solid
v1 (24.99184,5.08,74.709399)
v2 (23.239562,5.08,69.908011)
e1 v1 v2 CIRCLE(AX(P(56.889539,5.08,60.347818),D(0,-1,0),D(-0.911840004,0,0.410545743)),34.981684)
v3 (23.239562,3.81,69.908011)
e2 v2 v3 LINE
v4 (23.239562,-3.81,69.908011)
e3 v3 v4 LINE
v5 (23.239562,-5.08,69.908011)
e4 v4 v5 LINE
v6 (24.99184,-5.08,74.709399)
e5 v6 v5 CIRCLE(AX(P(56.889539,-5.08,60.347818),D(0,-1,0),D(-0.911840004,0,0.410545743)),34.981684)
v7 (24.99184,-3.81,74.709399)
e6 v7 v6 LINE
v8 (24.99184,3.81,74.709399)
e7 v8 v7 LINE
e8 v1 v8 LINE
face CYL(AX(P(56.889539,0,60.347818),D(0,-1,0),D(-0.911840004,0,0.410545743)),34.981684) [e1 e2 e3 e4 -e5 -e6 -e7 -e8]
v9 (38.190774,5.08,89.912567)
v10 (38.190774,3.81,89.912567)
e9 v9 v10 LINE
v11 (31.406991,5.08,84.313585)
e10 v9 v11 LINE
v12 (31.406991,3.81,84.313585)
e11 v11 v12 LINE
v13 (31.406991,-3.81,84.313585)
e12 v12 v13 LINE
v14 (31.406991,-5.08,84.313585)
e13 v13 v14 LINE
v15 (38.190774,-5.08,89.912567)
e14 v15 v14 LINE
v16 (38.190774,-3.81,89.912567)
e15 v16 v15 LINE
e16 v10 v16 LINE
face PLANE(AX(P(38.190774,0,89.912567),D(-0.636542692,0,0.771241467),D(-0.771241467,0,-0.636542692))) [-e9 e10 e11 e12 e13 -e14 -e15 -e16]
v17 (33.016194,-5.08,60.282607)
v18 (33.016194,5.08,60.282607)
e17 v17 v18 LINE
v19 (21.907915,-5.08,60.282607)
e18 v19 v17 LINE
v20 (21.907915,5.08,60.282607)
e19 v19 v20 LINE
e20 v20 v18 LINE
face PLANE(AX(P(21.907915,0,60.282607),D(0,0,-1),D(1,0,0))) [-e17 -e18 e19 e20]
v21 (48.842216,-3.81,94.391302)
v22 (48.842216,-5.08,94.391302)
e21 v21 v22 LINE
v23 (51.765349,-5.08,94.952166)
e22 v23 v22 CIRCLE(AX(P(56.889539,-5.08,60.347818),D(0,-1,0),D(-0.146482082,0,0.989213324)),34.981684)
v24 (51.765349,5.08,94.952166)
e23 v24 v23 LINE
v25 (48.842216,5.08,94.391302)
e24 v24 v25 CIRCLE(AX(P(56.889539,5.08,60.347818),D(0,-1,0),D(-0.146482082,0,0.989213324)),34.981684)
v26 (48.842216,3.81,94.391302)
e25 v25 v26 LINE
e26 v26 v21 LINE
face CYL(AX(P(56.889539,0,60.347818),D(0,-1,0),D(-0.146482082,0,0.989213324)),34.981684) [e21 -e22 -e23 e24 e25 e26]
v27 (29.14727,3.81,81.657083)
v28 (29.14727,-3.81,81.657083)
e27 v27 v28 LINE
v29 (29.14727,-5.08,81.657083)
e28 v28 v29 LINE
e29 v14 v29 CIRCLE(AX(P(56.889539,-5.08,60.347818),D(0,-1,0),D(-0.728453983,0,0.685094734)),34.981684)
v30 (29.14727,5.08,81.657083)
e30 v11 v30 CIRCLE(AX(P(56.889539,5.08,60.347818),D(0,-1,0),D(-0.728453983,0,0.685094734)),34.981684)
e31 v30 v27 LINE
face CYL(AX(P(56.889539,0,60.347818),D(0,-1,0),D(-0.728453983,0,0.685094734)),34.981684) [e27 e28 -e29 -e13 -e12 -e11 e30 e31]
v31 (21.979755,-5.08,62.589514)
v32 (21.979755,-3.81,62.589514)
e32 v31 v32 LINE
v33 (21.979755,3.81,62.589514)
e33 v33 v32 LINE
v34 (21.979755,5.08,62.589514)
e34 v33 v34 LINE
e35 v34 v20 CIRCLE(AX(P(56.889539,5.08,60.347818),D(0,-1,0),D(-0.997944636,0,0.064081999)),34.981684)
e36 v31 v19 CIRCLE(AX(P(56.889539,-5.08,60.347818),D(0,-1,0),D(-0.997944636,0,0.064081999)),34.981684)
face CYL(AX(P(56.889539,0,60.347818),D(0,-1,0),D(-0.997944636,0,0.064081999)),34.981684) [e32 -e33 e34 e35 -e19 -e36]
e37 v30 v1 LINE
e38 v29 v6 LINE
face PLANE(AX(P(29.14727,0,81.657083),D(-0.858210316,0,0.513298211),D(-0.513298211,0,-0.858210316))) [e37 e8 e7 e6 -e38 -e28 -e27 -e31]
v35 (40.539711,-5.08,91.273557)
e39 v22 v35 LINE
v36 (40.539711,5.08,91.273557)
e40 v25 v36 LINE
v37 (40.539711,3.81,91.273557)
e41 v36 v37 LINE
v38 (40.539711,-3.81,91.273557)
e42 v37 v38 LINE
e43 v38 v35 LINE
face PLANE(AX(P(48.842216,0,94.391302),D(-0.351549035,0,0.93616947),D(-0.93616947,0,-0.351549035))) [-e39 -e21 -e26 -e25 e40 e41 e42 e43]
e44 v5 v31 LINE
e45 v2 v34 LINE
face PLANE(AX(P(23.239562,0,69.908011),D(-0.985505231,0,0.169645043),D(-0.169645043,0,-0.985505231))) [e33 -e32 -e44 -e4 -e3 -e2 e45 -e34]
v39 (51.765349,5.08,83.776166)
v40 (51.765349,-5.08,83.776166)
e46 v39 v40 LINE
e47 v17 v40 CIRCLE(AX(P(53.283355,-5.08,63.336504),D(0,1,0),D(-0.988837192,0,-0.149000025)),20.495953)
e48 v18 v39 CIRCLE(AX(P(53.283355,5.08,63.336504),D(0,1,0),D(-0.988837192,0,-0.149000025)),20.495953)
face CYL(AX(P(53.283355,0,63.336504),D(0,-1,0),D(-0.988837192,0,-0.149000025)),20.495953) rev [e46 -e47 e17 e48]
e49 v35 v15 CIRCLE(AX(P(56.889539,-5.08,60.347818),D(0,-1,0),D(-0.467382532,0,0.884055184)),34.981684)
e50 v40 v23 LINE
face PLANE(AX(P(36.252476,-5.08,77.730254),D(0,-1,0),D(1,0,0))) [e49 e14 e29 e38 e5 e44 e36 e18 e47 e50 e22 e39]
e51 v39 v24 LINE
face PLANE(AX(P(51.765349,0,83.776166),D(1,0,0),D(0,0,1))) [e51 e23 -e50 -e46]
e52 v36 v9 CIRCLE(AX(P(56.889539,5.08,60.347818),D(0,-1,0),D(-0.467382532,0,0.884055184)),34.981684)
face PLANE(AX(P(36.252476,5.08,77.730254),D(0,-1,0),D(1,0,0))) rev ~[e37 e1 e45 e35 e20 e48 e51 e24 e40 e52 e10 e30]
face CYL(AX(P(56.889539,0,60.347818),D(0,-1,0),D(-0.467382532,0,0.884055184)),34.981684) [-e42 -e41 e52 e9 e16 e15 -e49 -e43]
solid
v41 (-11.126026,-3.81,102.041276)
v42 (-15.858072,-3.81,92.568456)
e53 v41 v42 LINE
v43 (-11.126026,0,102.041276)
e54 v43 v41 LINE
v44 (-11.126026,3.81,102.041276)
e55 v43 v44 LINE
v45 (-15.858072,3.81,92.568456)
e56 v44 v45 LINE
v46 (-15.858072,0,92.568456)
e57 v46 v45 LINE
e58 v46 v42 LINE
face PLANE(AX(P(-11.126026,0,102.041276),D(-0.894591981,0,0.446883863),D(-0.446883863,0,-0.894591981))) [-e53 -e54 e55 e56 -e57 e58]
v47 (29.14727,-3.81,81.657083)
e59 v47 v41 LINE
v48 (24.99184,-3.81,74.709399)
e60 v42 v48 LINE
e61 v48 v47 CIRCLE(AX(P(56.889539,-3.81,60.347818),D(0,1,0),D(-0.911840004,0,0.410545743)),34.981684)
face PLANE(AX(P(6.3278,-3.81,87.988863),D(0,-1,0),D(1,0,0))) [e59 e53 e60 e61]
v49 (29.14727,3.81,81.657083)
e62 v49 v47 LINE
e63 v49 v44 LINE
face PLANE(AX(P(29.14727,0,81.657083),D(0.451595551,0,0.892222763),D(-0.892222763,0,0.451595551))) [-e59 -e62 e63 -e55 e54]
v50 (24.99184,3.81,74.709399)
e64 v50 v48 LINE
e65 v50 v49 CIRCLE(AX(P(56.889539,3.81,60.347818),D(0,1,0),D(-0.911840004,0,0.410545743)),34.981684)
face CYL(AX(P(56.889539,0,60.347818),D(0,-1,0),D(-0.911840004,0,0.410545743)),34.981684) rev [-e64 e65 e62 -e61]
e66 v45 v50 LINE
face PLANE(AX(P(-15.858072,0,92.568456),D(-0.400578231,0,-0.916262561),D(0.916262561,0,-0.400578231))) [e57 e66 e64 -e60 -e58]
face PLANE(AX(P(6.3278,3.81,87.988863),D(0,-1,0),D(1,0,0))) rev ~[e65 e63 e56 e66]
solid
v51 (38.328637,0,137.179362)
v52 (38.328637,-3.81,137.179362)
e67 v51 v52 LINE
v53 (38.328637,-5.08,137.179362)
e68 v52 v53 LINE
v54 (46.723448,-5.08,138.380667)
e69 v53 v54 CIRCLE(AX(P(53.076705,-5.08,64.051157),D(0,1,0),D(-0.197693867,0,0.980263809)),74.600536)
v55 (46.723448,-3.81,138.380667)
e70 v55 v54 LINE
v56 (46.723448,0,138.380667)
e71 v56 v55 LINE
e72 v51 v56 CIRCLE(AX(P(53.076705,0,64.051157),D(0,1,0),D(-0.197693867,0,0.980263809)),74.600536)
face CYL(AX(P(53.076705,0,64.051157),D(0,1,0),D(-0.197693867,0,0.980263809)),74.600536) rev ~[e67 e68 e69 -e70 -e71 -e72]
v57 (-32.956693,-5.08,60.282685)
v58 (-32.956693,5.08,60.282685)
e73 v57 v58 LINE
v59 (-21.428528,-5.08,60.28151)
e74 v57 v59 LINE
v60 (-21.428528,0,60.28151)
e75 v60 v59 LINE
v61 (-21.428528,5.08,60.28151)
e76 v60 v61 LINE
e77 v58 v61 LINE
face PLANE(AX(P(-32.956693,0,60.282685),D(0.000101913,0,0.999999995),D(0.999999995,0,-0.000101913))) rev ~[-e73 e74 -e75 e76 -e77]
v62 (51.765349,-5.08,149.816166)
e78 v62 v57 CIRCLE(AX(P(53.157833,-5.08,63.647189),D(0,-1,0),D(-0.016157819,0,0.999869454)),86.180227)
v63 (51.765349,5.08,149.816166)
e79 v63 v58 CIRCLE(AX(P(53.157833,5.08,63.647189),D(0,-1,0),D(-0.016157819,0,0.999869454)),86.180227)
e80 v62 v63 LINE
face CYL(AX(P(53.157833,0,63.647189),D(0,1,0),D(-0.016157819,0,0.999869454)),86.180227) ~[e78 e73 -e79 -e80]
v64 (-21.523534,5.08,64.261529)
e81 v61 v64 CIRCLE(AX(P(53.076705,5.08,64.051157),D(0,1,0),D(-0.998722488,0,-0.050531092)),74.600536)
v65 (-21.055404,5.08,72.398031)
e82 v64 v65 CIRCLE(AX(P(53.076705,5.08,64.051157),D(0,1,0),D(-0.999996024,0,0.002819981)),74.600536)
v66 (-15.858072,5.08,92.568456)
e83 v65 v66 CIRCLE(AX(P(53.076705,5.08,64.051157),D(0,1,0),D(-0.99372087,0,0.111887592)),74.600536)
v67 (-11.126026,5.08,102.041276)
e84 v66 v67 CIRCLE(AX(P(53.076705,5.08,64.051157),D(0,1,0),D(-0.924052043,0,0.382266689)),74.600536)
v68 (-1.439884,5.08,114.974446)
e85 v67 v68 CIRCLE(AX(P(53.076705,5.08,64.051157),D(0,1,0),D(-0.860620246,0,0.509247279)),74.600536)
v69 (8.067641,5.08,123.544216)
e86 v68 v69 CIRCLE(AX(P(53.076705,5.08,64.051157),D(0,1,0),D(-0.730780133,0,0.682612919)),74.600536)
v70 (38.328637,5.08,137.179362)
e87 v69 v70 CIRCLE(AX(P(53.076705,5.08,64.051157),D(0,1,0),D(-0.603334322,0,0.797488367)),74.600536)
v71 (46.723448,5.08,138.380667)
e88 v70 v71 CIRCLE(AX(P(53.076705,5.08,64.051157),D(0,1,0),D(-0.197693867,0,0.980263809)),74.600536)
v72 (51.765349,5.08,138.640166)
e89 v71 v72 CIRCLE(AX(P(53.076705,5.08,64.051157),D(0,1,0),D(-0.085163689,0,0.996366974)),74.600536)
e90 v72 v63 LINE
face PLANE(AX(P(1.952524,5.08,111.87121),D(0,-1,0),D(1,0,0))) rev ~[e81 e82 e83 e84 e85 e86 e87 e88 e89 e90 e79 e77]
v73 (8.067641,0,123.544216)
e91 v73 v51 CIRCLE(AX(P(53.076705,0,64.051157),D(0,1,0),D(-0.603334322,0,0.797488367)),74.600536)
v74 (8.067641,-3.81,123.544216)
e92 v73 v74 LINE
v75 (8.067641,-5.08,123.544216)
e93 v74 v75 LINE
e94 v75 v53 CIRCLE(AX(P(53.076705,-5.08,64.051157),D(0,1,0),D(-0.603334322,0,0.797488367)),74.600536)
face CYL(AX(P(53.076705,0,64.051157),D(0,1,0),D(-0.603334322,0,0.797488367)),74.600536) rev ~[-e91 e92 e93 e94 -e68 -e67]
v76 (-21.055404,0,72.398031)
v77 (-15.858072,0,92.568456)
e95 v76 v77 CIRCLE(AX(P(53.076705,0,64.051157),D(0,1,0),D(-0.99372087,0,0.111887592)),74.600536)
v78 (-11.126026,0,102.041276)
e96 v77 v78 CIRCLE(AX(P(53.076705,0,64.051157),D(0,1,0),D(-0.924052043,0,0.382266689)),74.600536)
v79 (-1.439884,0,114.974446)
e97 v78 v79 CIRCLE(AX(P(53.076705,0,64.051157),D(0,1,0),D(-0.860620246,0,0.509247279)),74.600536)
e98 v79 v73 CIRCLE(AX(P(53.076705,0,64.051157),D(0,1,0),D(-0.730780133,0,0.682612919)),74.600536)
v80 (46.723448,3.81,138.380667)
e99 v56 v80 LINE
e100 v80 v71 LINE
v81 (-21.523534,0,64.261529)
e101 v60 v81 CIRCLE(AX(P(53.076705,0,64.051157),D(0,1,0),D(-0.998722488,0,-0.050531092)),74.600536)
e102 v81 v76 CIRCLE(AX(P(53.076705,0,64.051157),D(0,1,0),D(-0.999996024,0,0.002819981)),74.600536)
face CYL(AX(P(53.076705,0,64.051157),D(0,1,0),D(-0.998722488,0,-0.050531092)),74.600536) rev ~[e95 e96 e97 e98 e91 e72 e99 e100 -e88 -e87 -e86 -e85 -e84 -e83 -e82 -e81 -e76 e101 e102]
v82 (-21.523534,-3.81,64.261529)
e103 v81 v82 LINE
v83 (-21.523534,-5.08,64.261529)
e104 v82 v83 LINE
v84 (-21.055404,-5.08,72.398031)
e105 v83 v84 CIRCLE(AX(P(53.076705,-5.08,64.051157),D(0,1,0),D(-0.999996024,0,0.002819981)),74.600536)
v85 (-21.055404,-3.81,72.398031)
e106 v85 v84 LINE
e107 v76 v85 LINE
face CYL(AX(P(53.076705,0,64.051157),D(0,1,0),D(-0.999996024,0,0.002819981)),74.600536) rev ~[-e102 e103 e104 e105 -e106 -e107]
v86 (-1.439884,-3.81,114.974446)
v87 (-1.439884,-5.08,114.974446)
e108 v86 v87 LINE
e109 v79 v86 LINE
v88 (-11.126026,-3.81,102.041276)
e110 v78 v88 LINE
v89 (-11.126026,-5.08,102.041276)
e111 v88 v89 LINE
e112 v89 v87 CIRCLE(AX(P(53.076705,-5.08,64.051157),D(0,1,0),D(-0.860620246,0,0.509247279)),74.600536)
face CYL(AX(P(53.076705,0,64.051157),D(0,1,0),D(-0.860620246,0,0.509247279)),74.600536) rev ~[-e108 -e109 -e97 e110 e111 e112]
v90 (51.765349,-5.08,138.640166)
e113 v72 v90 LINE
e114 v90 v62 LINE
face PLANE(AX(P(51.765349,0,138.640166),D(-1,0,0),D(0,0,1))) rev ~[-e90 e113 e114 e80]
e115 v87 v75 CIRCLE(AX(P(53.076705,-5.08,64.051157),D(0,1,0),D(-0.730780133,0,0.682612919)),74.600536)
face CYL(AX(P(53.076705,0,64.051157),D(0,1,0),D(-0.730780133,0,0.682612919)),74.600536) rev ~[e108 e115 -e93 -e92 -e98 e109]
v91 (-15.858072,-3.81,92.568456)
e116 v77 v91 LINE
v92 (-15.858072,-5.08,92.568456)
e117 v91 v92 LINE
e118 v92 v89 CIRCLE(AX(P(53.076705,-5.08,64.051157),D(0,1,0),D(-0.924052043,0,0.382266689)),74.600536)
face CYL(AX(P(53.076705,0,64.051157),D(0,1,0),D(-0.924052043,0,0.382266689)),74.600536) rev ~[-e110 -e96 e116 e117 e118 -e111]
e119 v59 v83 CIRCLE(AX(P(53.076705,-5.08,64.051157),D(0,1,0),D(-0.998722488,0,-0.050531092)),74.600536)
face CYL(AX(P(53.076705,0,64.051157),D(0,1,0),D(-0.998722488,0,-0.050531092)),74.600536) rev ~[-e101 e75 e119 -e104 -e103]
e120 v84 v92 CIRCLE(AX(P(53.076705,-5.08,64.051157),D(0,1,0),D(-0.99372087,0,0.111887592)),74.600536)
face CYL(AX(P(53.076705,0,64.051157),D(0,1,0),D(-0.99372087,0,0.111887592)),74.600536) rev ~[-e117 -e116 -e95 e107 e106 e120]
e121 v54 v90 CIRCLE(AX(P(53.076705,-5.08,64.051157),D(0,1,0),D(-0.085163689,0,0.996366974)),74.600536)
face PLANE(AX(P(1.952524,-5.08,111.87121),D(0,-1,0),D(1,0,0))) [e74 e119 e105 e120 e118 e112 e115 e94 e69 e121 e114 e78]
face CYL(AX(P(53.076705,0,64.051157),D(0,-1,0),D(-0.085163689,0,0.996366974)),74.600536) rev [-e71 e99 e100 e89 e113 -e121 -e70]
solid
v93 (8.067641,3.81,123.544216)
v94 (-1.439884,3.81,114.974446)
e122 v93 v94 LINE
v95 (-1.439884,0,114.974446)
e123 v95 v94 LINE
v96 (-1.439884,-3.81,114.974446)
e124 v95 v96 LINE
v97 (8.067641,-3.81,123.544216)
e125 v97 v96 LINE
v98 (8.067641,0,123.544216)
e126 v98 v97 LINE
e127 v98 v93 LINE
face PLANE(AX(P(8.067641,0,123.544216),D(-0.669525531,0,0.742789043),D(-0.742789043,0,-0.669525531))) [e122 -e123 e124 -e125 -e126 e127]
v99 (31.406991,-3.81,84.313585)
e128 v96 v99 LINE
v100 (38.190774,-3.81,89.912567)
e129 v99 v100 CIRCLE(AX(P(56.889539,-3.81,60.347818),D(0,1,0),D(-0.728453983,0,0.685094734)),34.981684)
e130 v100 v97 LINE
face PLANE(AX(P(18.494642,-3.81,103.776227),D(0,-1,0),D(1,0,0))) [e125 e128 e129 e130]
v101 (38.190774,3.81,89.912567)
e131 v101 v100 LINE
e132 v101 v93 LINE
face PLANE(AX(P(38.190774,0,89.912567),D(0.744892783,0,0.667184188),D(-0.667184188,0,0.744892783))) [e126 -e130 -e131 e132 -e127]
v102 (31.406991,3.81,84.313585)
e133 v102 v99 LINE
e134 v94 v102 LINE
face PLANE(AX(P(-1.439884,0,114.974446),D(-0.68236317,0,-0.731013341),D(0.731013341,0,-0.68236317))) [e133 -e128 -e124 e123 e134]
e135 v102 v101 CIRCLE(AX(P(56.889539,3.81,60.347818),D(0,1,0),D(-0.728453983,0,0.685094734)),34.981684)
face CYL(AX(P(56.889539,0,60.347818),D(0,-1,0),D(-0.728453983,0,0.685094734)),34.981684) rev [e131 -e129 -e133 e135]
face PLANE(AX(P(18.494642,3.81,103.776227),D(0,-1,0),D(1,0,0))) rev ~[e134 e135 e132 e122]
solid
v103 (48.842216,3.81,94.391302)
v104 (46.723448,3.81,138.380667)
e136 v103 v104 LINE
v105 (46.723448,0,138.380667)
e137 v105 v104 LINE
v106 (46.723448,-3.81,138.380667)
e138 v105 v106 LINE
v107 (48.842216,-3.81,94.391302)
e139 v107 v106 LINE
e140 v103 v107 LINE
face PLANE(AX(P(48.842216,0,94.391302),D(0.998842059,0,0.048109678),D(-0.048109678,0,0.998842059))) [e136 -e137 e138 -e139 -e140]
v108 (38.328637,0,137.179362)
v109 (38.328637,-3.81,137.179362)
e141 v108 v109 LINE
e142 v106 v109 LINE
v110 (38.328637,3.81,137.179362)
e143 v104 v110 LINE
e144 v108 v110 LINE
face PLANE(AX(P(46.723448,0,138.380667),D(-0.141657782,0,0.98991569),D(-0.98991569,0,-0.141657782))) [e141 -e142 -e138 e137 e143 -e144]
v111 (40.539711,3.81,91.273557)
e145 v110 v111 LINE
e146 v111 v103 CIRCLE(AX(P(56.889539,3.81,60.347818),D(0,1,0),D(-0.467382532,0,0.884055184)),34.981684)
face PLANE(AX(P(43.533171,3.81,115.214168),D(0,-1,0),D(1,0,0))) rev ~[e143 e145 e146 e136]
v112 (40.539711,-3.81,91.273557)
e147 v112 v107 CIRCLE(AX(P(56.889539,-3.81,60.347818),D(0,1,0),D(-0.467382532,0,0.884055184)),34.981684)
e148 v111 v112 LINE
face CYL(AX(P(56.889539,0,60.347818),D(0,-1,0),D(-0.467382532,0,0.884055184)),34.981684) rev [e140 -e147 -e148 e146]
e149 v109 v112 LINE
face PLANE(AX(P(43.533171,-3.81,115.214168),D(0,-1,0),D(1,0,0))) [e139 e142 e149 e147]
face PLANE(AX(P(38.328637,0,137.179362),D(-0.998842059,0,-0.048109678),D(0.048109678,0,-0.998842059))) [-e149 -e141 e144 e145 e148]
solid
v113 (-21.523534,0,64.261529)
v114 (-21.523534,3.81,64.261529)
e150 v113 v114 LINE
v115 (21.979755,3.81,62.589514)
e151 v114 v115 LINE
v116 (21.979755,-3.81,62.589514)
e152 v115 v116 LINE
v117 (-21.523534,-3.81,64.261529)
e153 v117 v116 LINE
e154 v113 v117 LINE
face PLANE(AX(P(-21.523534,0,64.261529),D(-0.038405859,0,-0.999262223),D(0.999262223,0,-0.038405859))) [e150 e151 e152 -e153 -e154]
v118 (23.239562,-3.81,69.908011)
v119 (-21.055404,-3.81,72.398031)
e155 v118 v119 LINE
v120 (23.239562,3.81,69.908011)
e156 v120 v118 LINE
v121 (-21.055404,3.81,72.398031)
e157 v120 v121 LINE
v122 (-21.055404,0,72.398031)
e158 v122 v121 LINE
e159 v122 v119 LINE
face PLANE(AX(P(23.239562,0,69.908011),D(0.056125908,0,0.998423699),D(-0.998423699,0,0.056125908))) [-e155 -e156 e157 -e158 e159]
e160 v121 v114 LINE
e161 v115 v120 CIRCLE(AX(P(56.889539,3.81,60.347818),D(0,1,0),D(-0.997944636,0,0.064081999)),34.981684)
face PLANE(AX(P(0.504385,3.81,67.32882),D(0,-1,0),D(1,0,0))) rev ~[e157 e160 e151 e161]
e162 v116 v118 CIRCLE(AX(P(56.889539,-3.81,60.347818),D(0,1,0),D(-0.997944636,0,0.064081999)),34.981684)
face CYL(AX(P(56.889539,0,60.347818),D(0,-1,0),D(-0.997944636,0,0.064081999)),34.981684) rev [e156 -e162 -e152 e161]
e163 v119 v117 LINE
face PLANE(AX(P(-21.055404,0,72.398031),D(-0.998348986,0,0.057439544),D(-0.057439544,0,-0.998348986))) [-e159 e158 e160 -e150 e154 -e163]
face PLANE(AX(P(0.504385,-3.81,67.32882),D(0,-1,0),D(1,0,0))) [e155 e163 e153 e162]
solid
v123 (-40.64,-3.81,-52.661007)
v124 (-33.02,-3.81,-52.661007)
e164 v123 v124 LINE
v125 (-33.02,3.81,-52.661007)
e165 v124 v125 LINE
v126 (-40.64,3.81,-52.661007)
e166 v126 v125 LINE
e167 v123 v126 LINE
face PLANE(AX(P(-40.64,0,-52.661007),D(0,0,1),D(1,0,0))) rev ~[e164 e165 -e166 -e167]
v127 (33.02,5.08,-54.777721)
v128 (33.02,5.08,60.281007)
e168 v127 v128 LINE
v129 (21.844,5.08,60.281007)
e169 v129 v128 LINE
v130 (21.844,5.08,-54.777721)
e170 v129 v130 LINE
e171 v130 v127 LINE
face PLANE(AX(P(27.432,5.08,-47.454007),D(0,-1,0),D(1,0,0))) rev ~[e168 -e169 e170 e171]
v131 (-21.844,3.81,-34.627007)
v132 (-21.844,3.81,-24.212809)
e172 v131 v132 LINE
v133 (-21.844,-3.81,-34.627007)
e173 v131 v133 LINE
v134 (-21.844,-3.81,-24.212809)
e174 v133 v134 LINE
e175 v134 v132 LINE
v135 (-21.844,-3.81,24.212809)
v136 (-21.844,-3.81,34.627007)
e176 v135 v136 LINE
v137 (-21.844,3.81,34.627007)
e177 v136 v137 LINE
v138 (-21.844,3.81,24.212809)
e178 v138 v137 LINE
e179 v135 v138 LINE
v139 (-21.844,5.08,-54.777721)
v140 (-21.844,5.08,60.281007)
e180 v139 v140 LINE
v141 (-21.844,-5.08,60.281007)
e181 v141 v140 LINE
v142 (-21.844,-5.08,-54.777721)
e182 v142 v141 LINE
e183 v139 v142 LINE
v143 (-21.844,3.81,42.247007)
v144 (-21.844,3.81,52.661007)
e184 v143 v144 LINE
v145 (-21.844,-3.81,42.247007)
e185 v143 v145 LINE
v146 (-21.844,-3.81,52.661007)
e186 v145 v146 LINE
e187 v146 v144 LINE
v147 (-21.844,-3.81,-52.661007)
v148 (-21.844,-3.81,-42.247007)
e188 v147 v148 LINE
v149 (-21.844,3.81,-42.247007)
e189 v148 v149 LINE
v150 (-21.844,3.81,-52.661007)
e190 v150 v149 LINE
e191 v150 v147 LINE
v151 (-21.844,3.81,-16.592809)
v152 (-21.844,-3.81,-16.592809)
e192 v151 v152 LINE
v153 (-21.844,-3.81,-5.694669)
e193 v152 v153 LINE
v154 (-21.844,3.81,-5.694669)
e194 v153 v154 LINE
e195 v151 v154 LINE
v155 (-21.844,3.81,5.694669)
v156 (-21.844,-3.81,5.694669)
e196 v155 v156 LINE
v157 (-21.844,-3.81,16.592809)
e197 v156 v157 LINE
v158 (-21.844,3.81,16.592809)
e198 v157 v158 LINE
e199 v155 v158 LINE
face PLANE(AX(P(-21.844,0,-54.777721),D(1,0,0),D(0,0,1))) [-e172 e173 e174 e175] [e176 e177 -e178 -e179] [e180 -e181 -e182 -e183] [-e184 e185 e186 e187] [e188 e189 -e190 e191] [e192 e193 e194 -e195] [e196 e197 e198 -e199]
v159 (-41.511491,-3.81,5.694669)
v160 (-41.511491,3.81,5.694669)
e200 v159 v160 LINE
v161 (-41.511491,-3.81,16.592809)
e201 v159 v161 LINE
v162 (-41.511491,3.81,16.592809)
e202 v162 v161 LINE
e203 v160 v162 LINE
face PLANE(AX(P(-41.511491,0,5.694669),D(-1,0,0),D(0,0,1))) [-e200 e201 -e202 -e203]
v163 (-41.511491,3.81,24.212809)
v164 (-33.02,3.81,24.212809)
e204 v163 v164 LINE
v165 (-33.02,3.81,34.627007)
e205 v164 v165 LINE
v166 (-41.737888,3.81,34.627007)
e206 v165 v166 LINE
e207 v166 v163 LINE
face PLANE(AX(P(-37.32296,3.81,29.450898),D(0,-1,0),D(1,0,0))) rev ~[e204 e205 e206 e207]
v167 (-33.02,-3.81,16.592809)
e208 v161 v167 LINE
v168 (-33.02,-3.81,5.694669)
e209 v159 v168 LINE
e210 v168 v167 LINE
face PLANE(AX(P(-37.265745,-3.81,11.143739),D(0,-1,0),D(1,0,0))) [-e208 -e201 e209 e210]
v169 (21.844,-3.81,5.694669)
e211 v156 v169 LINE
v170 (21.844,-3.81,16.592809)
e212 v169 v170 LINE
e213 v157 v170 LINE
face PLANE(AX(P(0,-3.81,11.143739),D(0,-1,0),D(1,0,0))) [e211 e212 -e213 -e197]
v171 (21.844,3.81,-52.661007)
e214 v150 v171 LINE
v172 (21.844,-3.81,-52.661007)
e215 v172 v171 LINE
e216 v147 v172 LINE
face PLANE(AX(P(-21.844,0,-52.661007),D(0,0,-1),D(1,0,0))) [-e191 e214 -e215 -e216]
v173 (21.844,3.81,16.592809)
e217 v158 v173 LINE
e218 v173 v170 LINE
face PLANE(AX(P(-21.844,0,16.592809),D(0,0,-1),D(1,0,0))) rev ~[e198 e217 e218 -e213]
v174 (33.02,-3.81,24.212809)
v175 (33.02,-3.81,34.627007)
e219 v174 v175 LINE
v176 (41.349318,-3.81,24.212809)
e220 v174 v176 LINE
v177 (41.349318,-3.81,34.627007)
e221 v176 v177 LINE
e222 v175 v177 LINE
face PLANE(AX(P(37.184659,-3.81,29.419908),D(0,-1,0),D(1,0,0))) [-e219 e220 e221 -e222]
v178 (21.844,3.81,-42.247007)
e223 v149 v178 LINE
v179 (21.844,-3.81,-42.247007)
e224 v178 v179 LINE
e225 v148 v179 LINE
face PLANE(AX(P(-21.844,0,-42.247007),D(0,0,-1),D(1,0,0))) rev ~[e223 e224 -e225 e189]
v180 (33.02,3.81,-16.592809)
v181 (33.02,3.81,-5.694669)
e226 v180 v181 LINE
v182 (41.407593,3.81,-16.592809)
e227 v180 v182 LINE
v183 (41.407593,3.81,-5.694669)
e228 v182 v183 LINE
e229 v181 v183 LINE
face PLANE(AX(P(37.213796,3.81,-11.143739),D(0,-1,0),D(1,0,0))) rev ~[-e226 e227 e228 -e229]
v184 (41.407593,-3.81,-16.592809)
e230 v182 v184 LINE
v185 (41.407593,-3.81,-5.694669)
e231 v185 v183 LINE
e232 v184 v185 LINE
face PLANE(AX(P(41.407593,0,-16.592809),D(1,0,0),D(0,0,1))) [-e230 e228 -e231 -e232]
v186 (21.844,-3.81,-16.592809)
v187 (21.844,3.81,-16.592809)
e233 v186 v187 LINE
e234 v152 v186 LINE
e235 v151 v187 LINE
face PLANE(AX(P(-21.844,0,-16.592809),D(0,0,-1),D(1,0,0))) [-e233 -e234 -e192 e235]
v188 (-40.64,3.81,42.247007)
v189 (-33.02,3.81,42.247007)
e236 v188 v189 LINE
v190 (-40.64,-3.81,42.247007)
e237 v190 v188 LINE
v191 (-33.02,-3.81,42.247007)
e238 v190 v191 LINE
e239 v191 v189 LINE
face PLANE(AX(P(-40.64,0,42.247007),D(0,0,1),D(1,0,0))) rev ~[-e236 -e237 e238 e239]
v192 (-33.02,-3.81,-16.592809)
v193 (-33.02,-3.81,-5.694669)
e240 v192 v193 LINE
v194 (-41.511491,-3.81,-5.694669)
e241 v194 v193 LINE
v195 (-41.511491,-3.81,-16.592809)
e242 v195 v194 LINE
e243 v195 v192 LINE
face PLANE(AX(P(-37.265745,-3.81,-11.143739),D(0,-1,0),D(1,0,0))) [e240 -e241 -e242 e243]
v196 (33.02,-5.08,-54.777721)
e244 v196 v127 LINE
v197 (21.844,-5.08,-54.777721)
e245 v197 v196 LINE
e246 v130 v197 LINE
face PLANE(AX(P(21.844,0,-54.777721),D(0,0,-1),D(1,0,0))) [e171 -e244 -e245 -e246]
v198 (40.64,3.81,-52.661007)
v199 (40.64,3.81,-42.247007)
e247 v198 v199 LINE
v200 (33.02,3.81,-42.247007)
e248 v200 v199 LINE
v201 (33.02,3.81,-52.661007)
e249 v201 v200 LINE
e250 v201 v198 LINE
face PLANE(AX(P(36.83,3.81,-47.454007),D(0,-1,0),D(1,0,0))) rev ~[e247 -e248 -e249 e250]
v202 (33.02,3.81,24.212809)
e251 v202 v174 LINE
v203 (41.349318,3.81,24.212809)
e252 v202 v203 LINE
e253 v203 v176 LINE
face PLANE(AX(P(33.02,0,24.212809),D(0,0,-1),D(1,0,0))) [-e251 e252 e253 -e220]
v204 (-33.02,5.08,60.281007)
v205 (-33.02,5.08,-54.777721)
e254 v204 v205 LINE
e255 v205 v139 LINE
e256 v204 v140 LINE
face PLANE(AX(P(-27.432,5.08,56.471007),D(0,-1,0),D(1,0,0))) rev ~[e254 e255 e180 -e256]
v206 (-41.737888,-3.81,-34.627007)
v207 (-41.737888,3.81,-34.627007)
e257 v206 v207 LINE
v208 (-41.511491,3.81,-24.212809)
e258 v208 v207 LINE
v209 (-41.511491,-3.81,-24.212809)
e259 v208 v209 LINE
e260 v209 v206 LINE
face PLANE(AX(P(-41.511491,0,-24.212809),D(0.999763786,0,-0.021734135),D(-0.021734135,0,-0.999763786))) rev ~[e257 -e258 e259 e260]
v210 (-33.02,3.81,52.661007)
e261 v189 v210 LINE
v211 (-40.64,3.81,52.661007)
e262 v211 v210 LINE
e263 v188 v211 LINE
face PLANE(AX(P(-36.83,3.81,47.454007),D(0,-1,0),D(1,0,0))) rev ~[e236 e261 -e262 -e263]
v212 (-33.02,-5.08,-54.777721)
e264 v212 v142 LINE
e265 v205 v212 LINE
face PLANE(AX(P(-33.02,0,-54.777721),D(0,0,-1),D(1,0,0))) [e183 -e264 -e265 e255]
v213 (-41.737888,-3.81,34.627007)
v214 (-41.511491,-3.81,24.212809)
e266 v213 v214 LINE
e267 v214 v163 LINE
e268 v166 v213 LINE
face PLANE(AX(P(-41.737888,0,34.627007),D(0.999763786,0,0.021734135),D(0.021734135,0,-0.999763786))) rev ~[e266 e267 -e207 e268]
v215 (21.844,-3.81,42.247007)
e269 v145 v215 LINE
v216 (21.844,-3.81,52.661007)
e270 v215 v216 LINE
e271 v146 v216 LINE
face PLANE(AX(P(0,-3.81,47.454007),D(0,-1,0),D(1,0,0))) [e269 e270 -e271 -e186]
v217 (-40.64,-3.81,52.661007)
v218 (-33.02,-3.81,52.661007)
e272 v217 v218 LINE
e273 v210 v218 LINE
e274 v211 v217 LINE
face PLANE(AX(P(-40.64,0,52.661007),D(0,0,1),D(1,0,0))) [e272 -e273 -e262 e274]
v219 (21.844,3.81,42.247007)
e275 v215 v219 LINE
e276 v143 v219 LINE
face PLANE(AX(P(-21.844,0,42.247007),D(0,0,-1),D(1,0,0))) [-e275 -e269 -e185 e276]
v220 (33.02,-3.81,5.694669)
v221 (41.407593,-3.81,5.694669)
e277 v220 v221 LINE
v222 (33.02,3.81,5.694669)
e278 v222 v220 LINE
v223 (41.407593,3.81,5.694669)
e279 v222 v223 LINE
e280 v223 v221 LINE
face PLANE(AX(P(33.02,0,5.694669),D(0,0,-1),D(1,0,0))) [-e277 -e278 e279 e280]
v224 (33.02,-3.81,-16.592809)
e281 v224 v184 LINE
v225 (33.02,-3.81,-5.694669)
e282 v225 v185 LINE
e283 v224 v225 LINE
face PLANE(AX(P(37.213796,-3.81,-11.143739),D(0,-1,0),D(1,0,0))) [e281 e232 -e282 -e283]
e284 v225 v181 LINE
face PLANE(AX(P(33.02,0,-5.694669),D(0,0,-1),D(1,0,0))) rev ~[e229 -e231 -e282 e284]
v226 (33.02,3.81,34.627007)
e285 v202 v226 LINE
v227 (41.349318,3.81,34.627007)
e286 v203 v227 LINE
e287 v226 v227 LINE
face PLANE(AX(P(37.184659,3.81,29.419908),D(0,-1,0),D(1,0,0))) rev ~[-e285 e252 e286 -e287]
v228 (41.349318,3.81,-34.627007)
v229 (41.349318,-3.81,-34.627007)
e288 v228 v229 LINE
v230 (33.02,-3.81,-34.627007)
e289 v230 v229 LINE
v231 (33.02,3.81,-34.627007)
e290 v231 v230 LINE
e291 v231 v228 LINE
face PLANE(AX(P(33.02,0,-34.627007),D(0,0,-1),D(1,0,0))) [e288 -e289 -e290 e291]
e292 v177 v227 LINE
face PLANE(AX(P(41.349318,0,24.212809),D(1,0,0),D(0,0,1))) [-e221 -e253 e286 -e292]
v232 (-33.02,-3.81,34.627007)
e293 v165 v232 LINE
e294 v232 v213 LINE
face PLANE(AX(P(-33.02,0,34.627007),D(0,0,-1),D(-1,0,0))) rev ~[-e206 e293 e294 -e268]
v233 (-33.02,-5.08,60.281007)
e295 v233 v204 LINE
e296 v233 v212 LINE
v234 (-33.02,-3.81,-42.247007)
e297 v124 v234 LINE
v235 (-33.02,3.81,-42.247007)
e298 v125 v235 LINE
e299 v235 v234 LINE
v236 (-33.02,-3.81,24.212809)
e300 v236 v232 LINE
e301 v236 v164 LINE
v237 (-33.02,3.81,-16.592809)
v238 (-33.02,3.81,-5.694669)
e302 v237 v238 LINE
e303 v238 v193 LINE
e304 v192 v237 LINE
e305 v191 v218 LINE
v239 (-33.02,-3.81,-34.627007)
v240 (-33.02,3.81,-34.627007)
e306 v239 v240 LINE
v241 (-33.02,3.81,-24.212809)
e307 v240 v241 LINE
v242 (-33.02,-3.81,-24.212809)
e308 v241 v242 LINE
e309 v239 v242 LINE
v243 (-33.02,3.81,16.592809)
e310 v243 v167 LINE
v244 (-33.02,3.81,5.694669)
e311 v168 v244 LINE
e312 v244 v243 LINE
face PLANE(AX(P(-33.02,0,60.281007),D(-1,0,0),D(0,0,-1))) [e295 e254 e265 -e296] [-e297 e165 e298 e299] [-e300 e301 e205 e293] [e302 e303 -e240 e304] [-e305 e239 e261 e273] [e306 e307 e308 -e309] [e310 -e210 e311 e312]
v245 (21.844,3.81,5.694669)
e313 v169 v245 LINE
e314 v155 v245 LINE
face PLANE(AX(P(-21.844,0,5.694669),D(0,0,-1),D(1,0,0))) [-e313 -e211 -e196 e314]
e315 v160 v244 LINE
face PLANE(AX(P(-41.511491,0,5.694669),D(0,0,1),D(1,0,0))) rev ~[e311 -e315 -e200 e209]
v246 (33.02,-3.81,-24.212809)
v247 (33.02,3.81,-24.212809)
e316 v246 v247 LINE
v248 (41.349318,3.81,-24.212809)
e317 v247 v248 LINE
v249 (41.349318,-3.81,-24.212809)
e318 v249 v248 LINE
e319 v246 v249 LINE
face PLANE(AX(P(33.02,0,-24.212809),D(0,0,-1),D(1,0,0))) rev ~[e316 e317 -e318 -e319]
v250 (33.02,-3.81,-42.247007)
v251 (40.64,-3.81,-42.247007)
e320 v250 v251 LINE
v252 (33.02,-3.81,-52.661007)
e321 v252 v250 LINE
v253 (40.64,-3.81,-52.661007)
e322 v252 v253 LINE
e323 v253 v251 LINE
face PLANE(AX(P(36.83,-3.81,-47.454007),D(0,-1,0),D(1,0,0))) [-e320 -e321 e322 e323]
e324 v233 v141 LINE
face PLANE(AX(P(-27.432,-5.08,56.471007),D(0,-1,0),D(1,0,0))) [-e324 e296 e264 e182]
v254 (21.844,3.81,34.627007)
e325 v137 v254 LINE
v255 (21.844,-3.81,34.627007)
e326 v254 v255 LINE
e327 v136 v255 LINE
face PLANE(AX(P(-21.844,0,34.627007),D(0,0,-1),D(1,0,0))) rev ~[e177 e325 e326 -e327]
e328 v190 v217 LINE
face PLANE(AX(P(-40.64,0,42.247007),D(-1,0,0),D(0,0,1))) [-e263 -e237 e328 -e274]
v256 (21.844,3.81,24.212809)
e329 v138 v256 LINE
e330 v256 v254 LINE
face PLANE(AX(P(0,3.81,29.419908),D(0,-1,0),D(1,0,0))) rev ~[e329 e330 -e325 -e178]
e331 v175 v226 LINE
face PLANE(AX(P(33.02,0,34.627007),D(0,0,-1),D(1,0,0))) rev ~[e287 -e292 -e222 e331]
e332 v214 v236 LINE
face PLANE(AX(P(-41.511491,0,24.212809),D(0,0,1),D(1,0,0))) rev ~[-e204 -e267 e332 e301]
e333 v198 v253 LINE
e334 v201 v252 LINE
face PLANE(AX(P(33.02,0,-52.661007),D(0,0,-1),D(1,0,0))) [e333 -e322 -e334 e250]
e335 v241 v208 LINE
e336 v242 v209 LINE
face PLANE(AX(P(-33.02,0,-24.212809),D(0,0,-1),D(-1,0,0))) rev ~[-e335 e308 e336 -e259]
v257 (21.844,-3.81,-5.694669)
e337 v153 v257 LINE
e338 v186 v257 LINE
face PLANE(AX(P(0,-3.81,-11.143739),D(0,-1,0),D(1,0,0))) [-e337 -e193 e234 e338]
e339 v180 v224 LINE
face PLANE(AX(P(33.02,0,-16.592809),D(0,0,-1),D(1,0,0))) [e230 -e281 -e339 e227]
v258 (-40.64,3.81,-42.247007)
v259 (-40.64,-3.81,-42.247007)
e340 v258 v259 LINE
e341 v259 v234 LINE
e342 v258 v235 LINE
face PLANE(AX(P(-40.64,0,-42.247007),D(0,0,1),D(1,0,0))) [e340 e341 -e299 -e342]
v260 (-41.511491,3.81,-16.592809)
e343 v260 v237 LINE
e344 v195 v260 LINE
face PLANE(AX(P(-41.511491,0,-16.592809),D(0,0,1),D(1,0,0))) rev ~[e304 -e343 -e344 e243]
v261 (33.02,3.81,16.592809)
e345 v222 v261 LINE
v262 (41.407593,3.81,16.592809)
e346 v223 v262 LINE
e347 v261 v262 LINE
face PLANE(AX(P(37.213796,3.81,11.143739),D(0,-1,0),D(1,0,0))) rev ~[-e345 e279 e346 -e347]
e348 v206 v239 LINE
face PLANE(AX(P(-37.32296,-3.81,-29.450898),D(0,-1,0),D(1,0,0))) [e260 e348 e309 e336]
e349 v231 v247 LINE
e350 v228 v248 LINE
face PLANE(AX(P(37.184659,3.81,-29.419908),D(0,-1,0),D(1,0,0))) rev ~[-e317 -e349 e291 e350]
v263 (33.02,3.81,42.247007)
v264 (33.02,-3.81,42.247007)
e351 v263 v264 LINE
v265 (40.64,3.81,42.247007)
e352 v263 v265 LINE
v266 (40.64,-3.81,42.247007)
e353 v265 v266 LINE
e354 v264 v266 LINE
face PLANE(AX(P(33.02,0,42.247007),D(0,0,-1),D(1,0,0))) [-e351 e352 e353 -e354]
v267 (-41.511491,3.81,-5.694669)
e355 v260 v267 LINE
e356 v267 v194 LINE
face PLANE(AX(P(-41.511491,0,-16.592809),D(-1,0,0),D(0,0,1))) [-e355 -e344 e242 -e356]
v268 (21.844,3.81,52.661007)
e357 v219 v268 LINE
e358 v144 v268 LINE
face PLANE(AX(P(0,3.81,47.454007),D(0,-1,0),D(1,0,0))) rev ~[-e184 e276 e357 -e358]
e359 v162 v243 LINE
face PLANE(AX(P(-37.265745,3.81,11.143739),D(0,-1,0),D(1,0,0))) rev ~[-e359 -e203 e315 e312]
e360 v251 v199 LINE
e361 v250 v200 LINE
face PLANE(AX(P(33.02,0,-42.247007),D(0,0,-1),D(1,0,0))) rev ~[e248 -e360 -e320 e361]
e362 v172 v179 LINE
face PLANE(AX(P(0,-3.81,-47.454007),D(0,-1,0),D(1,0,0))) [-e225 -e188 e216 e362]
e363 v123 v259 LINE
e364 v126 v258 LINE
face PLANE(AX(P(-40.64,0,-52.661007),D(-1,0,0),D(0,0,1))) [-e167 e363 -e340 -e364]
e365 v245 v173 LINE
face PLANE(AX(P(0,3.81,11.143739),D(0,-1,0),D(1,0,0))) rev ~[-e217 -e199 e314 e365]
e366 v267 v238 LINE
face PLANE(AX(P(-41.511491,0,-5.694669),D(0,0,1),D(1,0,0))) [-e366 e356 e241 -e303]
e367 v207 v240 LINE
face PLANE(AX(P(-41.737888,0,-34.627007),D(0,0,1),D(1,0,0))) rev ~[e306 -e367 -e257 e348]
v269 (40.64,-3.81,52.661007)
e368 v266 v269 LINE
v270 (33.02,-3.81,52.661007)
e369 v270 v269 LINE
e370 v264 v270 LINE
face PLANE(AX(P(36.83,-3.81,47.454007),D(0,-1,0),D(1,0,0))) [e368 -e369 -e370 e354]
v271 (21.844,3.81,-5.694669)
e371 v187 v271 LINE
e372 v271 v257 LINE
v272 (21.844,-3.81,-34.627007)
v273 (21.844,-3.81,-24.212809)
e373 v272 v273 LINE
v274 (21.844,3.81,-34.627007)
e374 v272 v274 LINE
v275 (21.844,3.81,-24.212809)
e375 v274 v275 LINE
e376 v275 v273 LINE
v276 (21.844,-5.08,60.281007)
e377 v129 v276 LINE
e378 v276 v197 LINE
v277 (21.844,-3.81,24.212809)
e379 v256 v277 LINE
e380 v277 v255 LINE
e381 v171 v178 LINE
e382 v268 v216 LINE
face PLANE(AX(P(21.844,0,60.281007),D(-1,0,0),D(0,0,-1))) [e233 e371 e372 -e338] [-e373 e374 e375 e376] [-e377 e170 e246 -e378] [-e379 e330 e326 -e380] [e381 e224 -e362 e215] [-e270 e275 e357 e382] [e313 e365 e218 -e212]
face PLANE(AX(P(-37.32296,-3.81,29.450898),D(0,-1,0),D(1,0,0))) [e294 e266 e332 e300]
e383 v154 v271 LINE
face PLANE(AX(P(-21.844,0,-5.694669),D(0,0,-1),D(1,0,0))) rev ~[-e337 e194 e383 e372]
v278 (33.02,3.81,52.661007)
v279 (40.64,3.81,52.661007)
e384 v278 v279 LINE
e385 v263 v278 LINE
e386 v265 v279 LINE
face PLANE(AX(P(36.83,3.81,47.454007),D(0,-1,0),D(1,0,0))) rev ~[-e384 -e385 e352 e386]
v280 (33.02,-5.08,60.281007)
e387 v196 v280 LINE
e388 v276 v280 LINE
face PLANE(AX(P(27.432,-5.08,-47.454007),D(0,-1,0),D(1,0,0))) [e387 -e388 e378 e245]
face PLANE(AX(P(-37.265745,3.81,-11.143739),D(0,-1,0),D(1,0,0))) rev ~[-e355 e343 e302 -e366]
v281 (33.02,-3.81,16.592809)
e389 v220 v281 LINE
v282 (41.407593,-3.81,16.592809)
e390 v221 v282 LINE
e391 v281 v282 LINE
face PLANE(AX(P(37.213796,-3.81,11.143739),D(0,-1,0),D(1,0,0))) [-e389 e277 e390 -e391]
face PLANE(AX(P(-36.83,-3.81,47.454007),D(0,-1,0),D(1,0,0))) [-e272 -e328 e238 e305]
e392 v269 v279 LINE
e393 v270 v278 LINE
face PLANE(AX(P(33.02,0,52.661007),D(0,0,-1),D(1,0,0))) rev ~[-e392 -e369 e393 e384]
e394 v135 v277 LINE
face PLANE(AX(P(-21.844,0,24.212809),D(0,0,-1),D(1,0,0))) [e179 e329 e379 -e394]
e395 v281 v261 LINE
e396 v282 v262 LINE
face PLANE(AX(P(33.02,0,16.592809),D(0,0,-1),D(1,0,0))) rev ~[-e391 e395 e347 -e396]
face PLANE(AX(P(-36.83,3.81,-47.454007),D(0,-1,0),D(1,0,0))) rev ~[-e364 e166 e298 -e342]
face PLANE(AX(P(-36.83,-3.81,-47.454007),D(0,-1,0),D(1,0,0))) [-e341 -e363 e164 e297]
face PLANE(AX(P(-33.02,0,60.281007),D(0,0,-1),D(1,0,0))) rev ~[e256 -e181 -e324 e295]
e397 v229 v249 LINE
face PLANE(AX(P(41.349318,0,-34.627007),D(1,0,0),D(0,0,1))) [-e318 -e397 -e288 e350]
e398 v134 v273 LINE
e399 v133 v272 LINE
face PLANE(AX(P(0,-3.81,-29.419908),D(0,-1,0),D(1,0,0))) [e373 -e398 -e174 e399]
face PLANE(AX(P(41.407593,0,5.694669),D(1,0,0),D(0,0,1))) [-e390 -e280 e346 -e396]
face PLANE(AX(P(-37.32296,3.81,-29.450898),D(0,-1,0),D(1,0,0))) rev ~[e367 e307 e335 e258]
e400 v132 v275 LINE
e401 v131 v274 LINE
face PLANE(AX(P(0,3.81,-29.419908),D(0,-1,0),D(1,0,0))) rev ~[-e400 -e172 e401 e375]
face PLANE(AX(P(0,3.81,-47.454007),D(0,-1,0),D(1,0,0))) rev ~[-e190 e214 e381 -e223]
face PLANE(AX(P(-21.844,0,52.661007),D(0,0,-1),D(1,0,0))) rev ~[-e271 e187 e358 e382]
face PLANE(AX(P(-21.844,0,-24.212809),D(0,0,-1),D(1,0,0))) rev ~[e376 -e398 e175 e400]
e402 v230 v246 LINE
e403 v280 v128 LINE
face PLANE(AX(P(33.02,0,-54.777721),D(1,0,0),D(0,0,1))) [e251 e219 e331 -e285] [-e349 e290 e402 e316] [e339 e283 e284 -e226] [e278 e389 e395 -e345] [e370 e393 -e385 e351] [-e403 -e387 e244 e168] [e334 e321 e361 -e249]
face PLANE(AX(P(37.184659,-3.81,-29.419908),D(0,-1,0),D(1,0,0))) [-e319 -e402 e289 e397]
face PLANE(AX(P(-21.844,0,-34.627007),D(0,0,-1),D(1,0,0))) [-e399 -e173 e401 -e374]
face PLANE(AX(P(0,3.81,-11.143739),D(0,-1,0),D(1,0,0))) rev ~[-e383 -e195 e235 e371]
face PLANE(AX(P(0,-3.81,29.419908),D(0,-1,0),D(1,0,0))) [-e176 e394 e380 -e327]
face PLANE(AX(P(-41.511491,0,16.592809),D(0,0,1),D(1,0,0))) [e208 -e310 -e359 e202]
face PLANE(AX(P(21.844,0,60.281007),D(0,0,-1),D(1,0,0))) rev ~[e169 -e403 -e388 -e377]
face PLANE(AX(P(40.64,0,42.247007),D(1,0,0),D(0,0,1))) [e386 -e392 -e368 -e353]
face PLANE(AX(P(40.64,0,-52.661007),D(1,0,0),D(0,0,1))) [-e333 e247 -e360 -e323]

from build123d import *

# Parameters (mm, degrees)
F0_W          = 11.176
F0_H          = 7.62
F0_H_2        = 10.414
F0_H_3        = 10.414198041
F0_H_4        = 10.8981402591
F0_H_5        = 11.3893379234
F0_H_6        = 2.1167141254
F1_DEPTH      = 5.08
F1_DEPTH_BACK = 5.08
F0_W_2        = 43.688
F0_W_3        = 7.62
F0_W_4        = 8.491490941
F0_W_5        = 8.3875925946
F0_W_6        = 8.3293178785
F2_DEPTH      = 3.81
F2_DEPTH_BACK = 3.81
F4_DEPTH      = 5.08
F4_DEPTH_BACK = 5.08
F5_DEPTH      = 3.81
F5_DEPTH_BACK = 3.81


# Not quite as in the source:
# - a feature names something its author has since deleted; it is built from what else it names


with BuildPart() as f1:
    # F0 (on Front) → F1 (new body, two sides)
    with BuildSketch(Plane.XZ) as f1_sk:
        with Locations((-27.432, 56.4710072617)):
            Rectangle(F0_W, F0_H)
        with Locations((-27.432, 47.4540072617)):
            Rectangle(F0_W, F0_H_2)
        with Locations((-27.432, 38.4370072617)):
            Rectangle(F0_W, F0_H)
        with Locations((-27.432, 29.4199082413)):
            Rectangle(F0_W, F0_H_3)
        with Locations((-27.432, 20.4028092208)):
            Rectangle(F0_W, F0_H)
        with Locations((-27.432, 11.1437390912)):
            Rectangle(F0_W, F0_H_4)
        with Locations((-27.432, 0)):
            Rectangle(F0_W, F0_H_5)
        with Locations((-27.432, -11.1437390912)):
            Rectangle(F0_W, F0_H_4)
        with Locations((-27.432, -20.4028092208)):
            Rectangle(F0_W, F0_H)
        with Locations((-27.432, -29.4199082413)):
            Rectangle(F0_W, F0_H_3)
        with Locations((-27.432, -38.4370072617)):
            Rectangle(F0_W, F0_H)
        with Locations((-27.432, -47.4540072617)):
            Rectangle(F0_W, F0_H_2)
        with Locations((-27.432, -53.7193643245)):
            Rectangle(F0_W, F0_H_6)
    extrude(amount=F1_DEPTH)
    extrude(f1_sk.sketch, amount=-F1_DEPTH_BACK)



with BuildPart() as f1b:
    # F0 (on Front) → F1, piece 2 (new body, two sides)
    with BuildSketch(Plane.XZ) as f1_2_sk:
        with Locations((27.432, -47.4540072617)):
            Rectangle(F0_W, F0_H_2)
        with Locations((27.432, -38.4370072617)):
            Rectangle(F0_W, F0_H)
        with Locations((27.432, -29.4199082413)):
            Rectangle(F0_W, F0_H_3)
        with Locations((27.432, -20.4028092208)):
            Rectangle(F0_W, F0_H)
        with Locations((27.432, -11.1437390912)):
            Rectangle(F0_W, F0_H_4)
        with Locations((27.432, 0)):
            Rectangle(F0_W, F0_H_5)
        with Locations((27.432, 11.1437390912)):
            Rectangle(F0_W, F0_H_4)
        with Locations((27.432, 20.4028092208)):
            Rectangle(F0_W, F0_H)
        with Locations((27.432, 29.4199082413)):
            Rectangle(F0_W, F0_H_3)
        with Locations((27.432, 38.4370072617)):
            Rectangle(F0_W, F0_H)
        with Locations((27.432, 47.4540072617)):
            Rectangle(F0_W, F0_H_2)
        with Locations((27.432, 56.4710072617)):
            Rectangle(F0_W, F0_H)
        with Locations((27.432, -53.7193643245)):
            Rectangle(F0_W, F0_H_6)
    extrude(amount=F1_DEPTH)
    extrude(f1_2_sk.sketch, amount=-F1_DEPTH_BACK)


with BuildPart() as f1_1:
    add(f1.part)

    add(f1b.part)  # F2 merges F1b
    # F0 (on Front) → F2 (join, two sides)
    with BuildSketch(Plane.XZ) as f2_sk:
        with Locations((0, 29.4199082413)):
            Rectangle(F0_W_2, F0_H_3)
        with Locations((0, 47.4540072617)):
            Rectangle(F0_W_2, F0_H_2)
        with Locations((-36.83, 47.4540072617)):
            Rectangle(F0_W_3, F0_H_2)
        Polygon((-33.02, 24.2128092208), (-33.02, 34.6270072617), (-41.7378880084, 34.6270072617), (-41.511490941, 24.2128092208), align=None)
        with Locations((-37.2657454705, 11.1437390912)):
            Rectangle(F0_W_4, F0_H_4)
        with Locations((-37.2657454705, -11.1437390912)):
            Rectangle(F0_W_4, F0_H_4)
        with Locations((0, -11.1437390912)):
            Rectangle(F0_W_2, F0_H_4)
        with Locations((0, 11.1437390912)):
            Rectangle(F0_W_2, F0_H_4)
        with Locations((37.2137962973, -11.1437390912)):
            Rectangle(F0_W_5, F0_H_4)
        with Locations((37.2137962973, 11.1437390912)):
            Rectangle(F0_W_5, F0_H_4)
        with Locations((37.1846589392, 29.4199082413)):
            Rectangle(F0_W_6, F0_H_3)
        with Locations((36.83, 47.4540072617)):
            Rectangle(F0_W_3, F0_H_2)
        with Locations((37.1846589392, -29.4199082413)):
            Rectangle(F0_W_6, F0_H_3)
        with Locations((36.83, -47.4540072617)):
            Rectangle(F0_W_3, F0_H_2)
        with Locations((0, -47.4540072617)):
            Rectangle(F0_W_2, F0_H_2)
        with Locations((0, -29.4199082413)):
            Rectangle(F0_W_2, F0_H_3)
        Polygon((-33.02, -34.6270072617), (-33.02, -24.2128092208), (-41.511490941, -24.2128092208), (-41.7378880084, -34.6270072617), align=None)
        with Locations((-36.83, -47.4540072617)):
            Rectangle(F0_W_3, F0_H_2)
    extrude(amount=F2_DEPTH)
    extrude(f2_sk.sketch, amount=-F2_DEPTH_BACK)


with BuildPart() as f4:
    # F3 (on Front) → F4 (new body, two sides)
    with BuildSketch(Plane.XZ) as f4_sk:
        with BuildLine():
            ThreePointArc((46.7234483179, 138.3806666389), (49.2422027189, 138.5530795685), (51.7653487623, 138.6401657047))
            Line((51.7653487623, 138.6401657047), (51.7653487623, 149.8161657047))
            ThreePointArc((51.7653487623, 149.8161657047), (-9.4395332477, 122.8806362111), (-32.9566933215, 60.2826848626))
            Line((-32.9566933215, 60.2826848626), (-21.428527605, 60.2815099882))
            ThreePointArc((-21.428527605, 60.2815099882), (-21.5025853928, 62.2708854301), (-21.523534037, 64.2615286325))
            ThreePointArc((-21.523534037, 64.2615286325), (-21.4006641675, 68.3361772977), (-21.0554041735, 72.3980308506))
            ThreePointArc((-21.0554041735, 72.3980308506), (-19.1641769465, 82.6655299595), (-15.8580723991, 92.56845635))
            ThreePointArc((-15.8580723991, 92.56845635), (-13.6603359913, 97.3889321711), (-11.1260263684, 102.0412764398))
            ThreePointArc((-11.1260263684, 102.0412764398), (-6.6341482531, 108.7708829528), (-1.4398843374, 114.9744460578))
            ThreePointArc((-1.4398843374, 114.9744460578), (3.1297417642, 119.4636171712), (8.0676414189, 123.5442160236))
            ThreePointArc((8.0676414189, 123.5442160236), (22.4302043573, 132.0660955879), (38.328636759, 137.1793619255))
            ThreePointArc((38.328636759, 137.1793619255), (42.5089587111, 137.8993974077), (46.7234483179, 138.3806666389))
        make_face()
    extrude(amount=F4_DEPTH)
    extrude(f4_sk.sketch, amount=-F4_DEPTH_BACK)



with BuildPart() as f4b:
    # F3 (on Front) → F4, piece 2 (new body, two sides)
    with BuildSketch(Plane.XZ) as f4_2_sk:
        with BuildLine():
            ThreePointArc((33.0161936581, 60.2826066315), (37.2635168322, 76.1212177757), (51.7653487623, 83.7761657047))
            Line((51.7653487623, 83.7761657047), (51.7653487623, 94.9521657047))
            ThreePointArc((51.7653487623, 94.9521657047), (50.2978144115, 94.7028376295), (48.8422158841, 94.3913019379))
            Line((48.8422158841, 94.3913019379), (40.539710538, 91.2735568742))
            ThreePointArc((40.539710538, 91.2735568742), (39.3520349882, 90.6158567529), (38.190774115, 89.9125674487))
            Line((38.190774115, 89.9125674487), (31.4069914905, 84.3135852358))
            ThreePointArc((31.4069914905, 84.3135852358), (30.2440044025, 83.0135126621), (29.1472703966, 81.6570827214))
            Line((29.1472703966, 81.6570827214), (24.9918396341, 74.709399156))
            ThreePointArc((24.9918396341, 74.709399156), (24.0278925704, 72.340750689), (23.2395618841, 69.9080106226))
            Line((23.2395618841, 69.9080106226), (21.9797545722, 62.5895138801))
            ThreePointArc((21.9797545722, 62.5895138801), (21.9248040705, 61.4366528948), (21.9079152744, 60.2826066315))
            Line((21.9079152744, 60.2826066315), (33.0161936581, 60.2826066315))
        make_face()
    extrude(amount=F4_DEPTH)
    extrude(f4_2_sk.sketch, amount=-F4_DEPTH_BACK)


with BuildPart() as f4_1:
    add(f4.part)

    add(f4b.part)  # F5 merges F4b
    # F3 (on Front) → F5 (join, two sides)
    with BuildSketch(Plane.XZ) as f5_sk:
        with BuildLine():
            Line((-21.523534037, 64.2615286325), (21.9797545722, 62.5895138801))
            ThreePointArc((21.9797545722, 62.5895138801), (22.4149059417, 66.2822869441), (23.2395618841, 69.9080106226))
            Line((23.2395618841, 69.9080106226), (-21.0554041735, 72.3980308506))
            Line((-21.0554041735, 72.3980308506), (-21.523534037, 64.2615286325))
        make_face()
        with BuildLine():
            Line((-15.8580723991, 92.56845635), (24.9918396341, 74.709399156))
            ThreePointArc((24.9918396341, 74.709399156), (26.8678964449, 78.3038535456), (29.1472703966, 81.6570827214))
            Line((29.1472703966, 81.6570827214), (-11.1260263684, 102.0412764398))
            Line((-11.1260263684, 102.0412764398), (-15.8580723991, 92.56845635))
        make_face()
        with BuildLine():
            ThreePointArc((31.4069914905, 84.3135852358), (34.6222032412, 87.327143059), (38.190774115, 89.9125674487))
            Line((38.190774115, 89.9125674487), (8.0676414189, 123.5442160236))
            Line((8.0676414189, 123.5442160236), (-1.4398843374, 114.9744460578))
            Line((-1.4398843374, 114.9744460578), (31.4069914905, 84.3135852358))
        make_face()
        with BuildLine():
            ThreePointArc((40.539710538, 91.2735568742), (44.5917613588, 93.0966023555), (48.8422158841, 94.3913019379))
            Line((48.8422158841, 94.3913019379), (46.7234483179, 138.3806666389))
            Line((46.7234483179, 138.3806666389), (38.328636759, 137.1793619255))
            Line((38.328636759, 137.1793619255), (40.539710538, 91.2735568742))
        make_face()
    extrude(amount=F5_DEPTH)
    extrude(f5_sk.sketch, amount=-F5_DEPTH_BACK)


solid = Compound([f1_1.part, f4_1.part])
